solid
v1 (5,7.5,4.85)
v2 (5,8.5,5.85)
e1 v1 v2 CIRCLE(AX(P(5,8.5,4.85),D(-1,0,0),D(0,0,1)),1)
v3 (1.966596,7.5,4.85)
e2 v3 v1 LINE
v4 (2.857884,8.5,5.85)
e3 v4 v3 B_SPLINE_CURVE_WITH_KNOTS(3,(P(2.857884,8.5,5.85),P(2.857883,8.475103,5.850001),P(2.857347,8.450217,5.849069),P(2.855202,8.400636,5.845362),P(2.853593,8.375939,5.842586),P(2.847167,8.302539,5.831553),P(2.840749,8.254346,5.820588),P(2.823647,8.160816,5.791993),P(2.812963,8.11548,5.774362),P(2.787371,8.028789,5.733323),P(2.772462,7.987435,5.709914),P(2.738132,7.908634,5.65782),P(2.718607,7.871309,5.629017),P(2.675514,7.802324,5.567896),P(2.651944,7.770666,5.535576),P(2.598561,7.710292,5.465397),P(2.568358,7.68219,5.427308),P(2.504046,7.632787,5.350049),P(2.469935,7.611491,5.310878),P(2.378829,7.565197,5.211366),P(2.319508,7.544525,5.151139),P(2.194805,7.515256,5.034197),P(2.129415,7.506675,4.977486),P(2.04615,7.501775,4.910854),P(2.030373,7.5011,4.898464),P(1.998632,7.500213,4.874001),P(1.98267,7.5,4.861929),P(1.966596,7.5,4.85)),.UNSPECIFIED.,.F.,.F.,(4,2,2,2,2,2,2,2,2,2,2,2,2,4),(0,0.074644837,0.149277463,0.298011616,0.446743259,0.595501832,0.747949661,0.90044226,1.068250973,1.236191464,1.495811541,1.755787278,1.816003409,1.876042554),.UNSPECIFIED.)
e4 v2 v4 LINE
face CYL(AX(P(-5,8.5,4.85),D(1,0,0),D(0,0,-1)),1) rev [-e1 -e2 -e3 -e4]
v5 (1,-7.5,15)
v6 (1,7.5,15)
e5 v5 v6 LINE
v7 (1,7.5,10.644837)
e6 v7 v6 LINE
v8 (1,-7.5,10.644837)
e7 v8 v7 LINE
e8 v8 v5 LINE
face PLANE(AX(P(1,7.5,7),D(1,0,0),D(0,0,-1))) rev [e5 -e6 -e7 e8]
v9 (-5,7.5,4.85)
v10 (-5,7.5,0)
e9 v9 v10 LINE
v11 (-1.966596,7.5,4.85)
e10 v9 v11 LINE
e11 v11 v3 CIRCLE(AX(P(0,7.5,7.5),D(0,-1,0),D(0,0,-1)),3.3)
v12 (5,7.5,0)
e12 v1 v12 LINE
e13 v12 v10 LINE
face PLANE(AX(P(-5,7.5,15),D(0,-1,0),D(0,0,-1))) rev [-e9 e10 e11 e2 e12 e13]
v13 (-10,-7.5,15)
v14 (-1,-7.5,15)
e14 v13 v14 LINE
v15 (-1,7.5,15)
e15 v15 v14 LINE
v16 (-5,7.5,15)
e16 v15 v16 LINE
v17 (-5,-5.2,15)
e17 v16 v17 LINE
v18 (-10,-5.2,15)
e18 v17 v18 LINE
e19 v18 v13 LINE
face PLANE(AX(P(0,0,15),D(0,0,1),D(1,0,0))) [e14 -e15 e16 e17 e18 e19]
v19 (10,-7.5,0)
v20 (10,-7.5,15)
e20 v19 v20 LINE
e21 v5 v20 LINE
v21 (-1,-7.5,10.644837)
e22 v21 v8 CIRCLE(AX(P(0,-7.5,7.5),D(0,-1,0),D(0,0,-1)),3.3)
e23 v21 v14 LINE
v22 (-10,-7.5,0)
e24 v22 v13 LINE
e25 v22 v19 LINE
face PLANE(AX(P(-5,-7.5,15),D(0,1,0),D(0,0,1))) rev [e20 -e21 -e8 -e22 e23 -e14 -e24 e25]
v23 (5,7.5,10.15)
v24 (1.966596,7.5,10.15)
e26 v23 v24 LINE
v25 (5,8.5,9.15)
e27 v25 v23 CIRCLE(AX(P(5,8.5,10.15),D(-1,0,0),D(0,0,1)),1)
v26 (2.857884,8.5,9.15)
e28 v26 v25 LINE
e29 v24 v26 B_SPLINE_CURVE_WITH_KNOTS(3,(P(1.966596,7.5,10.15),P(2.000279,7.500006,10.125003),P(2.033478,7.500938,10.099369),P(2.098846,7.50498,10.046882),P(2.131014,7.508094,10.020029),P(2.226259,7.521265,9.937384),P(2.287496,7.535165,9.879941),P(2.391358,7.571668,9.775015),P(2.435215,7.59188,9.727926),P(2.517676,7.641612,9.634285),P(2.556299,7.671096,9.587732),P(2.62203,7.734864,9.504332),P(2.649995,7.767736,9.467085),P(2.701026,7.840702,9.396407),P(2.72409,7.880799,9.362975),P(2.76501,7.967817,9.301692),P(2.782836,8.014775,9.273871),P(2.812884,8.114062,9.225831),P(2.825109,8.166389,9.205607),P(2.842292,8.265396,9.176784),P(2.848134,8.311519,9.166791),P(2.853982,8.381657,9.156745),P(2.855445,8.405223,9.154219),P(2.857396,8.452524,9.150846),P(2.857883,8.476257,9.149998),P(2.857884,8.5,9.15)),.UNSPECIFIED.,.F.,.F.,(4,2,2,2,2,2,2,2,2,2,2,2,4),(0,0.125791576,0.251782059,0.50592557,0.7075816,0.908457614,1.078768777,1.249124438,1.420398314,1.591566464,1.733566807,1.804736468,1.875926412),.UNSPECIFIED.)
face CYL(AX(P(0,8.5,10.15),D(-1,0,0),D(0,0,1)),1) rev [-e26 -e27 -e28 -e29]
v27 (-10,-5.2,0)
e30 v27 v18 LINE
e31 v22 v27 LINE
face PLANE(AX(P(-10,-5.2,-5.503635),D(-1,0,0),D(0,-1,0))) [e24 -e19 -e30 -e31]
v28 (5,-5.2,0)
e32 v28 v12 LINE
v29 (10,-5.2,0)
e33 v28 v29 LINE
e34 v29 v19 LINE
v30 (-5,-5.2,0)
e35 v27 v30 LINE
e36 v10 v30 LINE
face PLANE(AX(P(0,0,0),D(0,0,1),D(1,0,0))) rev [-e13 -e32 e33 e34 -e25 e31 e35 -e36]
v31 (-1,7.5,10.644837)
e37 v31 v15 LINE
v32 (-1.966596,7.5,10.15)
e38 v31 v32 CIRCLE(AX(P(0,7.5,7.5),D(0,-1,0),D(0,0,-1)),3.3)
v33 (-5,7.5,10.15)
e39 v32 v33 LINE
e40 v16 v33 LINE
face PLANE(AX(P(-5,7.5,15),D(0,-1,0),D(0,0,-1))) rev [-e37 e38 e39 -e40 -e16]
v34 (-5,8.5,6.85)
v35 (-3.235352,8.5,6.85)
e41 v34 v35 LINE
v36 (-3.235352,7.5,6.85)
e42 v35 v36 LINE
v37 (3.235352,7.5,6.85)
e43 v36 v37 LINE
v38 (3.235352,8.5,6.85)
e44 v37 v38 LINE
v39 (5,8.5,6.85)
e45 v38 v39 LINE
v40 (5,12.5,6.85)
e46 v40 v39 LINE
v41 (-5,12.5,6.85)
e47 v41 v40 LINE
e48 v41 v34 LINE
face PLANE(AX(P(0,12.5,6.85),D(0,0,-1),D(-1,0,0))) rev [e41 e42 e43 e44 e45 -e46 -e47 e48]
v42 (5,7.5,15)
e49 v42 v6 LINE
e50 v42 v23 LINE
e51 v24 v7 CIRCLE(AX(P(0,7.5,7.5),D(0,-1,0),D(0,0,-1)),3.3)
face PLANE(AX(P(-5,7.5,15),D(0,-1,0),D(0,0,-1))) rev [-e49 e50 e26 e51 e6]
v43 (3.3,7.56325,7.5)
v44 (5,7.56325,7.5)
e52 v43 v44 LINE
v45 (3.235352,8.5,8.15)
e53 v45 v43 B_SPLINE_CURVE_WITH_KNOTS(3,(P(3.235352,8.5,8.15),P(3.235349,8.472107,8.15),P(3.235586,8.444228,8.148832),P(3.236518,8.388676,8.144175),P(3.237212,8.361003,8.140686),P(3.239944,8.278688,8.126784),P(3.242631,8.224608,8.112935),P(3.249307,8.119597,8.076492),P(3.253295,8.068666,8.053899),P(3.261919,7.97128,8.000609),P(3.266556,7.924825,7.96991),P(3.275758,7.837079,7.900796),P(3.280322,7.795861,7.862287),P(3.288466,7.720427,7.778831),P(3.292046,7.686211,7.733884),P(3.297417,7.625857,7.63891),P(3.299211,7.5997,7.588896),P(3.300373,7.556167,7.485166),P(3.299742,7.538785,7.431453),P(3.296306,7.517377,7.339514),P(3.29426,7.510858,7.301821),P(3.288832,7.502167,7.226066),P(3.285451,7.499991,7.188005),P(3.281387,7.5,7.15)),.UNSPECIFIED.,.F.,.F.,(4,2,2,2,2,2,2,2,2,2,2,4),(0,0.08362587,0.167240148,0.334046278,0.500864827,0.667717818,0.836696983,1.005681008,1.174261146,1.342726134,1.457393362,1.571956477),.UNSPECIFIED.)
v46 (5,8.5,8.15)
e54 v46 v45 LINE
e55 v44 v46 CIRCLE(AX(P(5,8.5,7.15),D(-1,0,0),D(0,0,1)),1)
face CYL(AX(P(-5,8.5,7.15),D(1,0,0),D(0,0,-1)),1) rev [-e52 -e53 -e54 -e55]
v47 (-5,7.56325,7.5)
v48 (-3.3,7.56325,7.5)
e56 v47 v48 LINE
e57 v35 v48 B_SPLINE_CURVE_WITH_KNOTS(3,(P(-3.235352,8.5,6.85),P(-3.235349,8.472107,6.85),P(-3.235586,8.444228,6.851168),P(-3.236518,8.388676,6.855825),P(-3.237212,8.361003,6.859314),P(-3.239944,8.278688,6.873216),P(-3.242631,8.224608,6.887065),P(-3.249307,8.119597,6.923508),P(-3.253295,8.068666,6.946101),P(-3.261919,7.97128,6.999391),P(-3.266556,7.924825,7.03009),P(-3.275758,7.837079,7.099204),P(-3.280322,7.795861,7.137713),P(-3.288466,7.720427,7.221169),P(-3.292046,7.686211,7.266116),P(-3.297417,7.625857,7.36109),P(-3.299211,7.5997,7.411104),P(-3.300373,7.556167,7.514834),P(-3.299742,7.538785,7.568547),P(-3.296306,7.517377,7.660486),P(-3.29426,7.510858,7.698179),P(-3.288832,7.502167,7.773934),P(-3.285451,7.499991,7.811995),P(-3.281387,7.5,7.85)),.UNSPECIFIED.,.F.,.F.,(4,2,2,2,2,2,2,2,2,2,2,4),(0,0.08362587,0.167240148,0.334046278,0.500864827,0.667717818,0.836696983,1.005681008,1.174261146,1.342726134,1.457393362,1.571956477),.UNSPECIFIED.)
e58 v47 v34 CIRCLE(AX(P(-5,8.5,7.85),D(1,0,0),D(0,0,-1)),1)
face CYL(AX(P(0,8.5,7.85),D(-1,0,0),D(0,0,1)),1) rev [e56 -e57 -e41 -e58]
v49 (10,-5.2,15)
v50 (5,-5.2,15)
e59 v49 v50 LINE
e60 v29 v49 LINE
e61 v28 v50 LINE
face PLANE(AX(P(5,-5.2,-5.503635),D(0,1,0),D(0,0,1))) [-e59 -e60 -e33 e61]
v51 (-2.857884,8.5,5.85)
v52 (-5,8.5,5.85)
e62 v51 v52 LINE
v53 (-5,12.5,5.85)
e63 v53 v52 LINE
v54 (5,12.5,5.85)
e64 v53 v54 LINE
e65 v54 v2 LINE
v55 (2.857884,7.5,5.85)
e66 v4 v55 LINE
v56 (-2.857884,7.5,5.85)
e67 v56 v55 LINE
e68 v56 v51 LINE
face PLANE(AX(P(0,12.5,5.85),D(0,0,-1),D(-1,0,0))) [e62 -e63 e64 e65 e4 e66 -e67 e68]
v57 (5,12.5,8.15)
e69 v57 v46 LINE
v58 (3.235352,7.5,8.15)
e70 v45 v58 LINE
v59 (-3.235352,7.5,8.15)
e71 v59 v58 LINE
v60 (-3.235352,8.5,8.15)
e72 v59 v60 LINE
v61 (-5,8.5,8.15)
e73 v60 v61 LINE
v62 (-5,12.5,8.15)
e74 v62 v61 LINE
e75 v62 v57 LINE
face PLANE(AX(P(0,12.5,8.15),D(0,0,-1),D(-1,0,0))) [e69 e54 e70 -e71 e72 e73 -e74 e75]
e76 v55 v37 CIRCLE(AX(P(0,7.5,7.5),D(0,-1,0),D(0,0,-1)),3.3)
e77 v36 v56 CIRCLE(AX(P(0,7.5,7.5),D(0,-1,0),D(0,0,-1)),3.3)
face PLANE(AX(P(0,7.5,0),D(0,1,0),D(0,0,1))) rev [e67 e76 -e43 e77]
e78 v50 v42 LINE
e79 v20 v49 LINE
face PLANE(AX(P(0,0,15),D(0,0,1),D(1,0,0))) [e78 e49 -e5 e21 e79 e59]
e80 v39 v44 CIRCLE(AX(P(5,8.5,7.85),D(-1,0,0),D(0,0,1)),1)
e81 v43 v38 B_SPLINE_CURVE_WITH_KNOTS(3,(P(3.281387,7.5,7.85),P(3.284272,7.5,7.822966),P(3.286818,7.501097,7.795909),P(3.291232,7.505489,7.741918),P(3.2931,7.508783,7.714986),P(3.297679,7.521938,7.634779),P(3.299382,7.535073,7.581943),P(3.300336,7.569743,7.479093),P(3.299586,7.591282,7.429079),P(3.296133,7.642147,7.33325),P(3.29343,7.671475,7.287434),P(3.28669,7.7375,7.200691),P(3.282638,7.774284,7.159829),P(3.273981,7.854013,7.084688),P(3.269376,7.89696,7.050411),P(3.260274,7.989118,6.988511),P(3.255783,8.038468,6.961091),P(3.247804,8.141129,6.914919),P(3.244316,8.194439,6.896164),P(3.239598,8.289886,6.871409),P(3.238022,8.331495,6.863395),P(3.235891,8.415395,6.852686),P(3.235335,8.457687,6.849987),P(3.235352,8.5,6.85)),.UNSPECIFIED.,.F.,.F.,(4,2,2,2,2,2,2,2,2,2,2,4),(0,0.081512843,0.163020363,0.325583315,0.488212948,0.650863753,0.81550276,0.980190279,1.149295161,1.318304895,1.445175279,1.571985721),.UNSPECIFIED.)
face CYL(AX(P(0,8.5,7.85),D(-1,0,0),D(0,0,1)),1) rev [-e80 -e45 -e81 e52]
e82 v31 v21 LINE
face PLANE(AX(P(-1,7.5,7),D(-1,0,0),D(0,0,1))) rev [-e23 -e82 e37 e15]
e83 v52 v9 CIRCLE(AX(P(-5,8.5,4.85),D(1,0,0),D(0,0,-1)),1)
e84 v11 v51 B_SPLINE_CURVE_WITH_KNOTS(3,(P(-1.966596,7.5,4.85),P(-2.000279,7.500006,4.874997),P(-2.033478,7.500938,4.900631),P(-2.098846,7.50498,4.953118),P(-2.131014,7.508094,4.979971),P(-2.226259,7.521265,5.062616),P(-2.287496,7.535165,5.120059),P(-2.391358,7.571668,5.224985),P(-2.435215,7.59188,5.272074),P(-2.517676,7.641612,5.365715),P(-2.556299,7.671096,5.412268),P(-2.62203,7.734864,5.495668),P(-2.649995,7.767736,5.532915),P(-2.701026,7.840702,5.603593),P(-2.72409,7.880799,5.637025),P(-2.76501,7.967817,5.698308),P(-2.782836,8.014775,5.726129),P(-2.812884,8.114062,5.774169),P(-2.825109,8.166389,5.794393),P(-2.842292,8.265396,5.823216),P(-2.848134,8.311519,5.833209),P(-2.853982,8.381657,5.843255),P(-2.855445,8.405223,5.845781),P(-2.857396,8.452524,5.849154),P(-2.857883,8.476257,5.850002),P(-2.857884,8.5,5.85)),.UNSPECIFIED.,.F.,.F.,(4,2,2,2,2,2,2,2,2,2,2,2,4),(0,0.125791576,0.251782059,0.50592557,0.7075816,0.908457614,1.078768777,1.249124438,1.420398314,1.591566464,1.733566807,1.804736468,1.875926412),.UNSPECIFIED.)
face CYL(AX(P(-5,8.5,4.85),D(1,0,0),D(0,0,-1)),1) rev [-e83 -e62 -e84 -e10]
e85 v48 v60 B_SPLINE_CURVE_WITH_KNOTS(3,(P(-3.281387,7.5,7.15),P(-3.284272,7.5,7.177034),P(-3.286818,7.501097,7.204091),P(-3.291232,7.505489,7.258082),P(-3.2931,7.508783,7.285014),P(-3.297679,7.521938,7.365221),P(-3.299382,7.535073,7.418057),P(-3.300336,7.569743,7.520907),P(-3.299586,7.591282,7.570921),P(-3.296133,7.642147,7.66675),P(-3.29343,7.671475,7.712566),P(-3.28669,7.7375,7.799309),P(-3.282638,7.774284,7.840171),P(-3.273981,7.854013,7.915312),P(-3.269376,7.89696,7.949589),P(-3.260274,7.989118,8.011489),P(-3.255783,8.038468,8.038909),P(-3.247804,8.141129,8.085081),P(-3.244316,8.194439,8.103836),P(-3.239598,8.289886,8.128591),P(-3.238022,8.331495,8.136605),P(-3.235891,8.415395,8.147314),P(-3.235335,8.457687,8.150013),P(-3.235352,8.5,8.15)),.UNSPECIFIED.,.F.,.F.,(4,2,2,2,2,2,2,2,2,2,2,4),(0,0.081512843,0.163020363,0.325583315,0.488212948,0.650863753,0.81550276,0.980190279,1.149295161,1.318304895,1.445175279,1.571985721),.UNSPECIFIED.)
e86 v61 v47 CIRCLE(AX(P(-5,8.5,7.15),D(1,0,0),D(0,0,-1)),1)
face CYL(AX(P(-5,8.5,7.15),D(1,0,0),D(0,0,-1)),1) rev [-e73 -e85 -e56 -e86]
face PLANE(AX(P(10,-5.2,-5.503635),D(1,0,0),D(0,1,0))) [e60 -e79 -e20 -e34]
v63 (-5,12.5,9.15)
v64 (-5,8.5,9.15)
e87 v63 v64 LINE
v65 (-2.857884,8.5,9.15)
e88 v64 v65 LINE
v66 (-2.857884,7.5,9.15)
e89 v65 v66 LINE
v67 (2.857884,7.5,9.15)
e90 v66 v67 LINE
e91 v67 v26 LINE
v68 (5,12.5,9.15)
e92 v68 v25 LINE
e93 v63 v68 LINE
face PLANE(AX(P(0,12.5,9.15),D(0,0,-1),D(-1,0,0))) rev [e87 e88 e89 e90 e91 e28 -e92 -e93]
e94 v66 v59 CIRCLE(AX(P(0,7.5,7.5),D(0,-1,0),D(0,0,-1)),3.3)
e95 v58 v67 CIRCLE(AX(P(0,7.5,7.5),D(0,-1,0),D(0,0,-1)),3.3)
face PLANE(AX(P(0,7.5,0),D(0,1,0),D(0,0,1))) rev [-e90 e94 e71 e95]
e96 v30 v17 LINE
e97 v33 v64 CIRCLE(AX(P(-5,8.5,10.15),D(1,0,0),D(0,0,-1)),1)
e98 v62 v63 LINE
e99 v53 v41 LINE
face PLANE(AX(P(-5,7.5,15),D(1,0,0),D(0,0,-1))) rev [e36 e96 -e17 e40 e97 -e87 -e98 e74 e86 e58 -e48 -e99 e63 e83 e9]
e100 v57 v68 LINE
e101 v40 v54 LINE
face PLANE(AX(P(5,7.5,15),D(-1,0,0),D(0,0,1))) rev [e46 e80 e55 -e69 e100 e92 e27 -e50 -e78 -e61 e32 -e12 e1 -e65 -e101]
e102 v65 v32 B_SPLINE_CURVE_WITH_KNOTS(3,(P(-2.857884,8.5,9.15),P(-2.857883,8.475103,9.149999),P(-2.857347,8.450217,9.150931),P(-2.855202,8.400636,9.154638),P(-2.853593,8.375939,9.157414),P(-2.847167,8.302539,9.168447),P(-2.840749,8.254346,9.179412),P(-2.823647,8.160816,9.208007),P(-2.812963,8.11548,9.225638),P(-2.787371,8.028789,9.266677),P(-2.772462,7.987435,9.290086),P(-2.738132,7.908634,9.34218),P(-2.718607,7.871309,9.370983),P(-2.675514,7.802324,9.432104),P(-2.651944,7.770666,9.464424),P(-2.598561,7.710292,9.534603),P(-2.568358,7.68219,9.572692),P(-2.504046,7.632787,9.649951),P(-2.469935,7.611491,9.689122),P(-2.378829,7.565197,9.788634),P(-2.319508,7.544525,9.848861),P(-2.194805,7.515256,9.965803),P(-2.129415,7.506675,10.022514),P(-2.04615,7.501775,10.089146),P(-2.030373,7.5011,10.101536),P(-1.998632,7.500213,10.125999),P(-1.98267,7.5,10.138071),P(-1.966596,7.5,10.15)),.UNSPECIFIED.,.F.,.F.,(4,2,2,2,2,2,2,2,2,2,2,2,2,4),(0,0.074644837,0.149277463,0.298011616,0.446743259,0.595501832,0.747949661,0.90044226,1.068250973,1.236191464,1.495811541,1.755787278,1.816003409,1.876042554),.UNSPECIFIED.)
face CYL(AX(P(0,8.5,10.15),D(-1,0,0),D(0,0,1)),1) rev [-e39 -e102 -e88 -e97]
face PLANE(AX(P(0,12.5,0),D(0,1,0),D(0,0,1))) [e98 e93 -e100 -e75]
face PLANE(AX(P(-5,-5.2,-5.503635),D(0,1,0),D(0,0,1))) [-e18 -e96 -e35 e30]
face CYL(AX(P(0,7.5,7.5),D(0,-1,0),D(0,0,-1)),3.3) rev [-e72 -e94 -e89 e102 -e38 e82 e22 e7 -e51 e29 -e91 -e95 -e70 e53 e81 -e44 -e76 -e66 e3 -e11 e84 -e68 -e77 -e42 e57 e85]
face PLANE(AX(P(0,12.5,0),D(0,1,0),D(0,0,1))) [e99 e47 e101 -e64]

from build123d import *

# Parameters (mm, degrees)
SKETCH1_W           = 10
SKETCH1_H           = 15
BOSS_EXTRUDE1_DEPTH = 15
SKETCH3_W           = 5
SKETCH3_H           = 2.3
BOSS_EXTRUDE2_DEPTH = 15
SKETCH4_R           = 3.3
CUT_EXTRUDE1_DEPTH  = 24.452078799
SKETCH6_W           = 2
SKETCH6_H           = 15
CUT_EXTRUDE2_DEPTH  = 8
SKETCH7_W           = 10
SKETCH7_H           = 1
BOSS_EXTRUDE3_DEPTH = 5
FILLET1_R           = 1


with BuildPart() as part:
    # Sketch1 → Boss-Extrude1 (new body)
    with BuildSketch(Plane.XY):
        Rectangle(SKETCH1_W, SKETCH1_H)
    extrude(amount=BOSS_EXTRUDE1_DEPTH)

    # Sketch3 → Boss-Extrude2 (add)
    with BuildSketch(Plane.XY.offset(15)):
        with Locations((-7.5, -6.35)):
            Rectangle(SKETCH3_W, SKETCH3_H)
        with Locations((7.5, -6.35)):
            Rectangle(SKETCH3_W, SKETCH3_H)
    extrude(amount=-BOSS_EXTRUDE2_DEPTH)

    # Sketch4 → Cut-Extrude1 (cut, through all)
    with BuildSketch(Plane.XZ.offset(7.5)):
        with Locations(Location((0, 7.5, 0), (0, 0, 270))):
            Circle(SKETCH4_R)
    extrude(amount=-CUT_EXTRUDE1_DEPTH, mode=Mode.SUBTRACT)

    # Sketch6 → Cut-Extrude2 (cut)
    with BuildSketch(Plane.XY.offset(15)):
        Rectangle(SKETCH6_W, SKETCH6_H)
    extrude(amount=-CUT_EXTRUDE2_DEPTH, mode=Mode.SUBTRACT)

    # Sketch7 → Boss-Extrude3 (add)
    with BuildSketch(Plane(origin=(0, 7.5, 0), x_dir=(1, 0, 0), z_dir=(0, 1, 0))):
        with Locations((0, -8.65)):
            Rectangle(SKETCH7_W, SKETCH7_H)
        with Locations((0, -6.35)):
            Rectangle(SKETCH7_W, SKETCH7_H)
    extrude(amount=BOSS_EXTRUDE3_DEPTH)

    # Fillet1
    # the kernel refuses this fillet: 1 mm, written as the material it adds along each edge
    with BuildSketch(Plane(origin=(5, 7.5, 5.85), x_dir=(0, 0, -1), z_dir=(-1, 0, 0))) as fillet1_piece_1_section:
        with BuildLine():
            CenterArc((FILLET1_R, -FILLET1_R), FILLET1_R, 90, 90)
            Line((0, -FILLET1_R), (0, 0))
            Line((0, 0), (FILLET1_R, 0))
        make_face()
    fillet1_piece_1 = extrude(amount=4.642116168, mode=Mode.PRIVATE)
    fillet1_piece_1 = fillet1_piece_1 - Plane(origin=(0, 7.716795794, 7.5), x_dir=(0, 0, -1), z_dir=(0, -1, 0)) * Cylinder(3.3, 14, mode=Mode.PRIVATE)
    add(fillet1_piece_1)
    with BuildSketch(Plane(origin=(0.735351604, 7.5, 6.85), x_dir=(0, 0, 1), z_dir=(1, 0, 0))) as fillet1_piece_2_section:
        with BuildLine():
            CenterArc((FILLET1_R, -FILLET1_R), FILLET1_R, 90, 90)
            Line((0, -FILLET1_R), (0, 0))
            Line((0, 0), (FILLET1_R, 0))
        make_face()
    fillet1_piece_2 = extrude(amount=4.264648396, mode=Mode.PRIVATE)
    fillet1_piece_2 = fillet1_piece_2 - Plane(origin=(0, 7.724716743, 7.5), x_dir=(0, 0, -1), z_dir=(0, -1, 0)) * Cylinder(3.3, 13, mode=Mode.PRIVATE)
    add(fillet1_piece_2)
    with BuildSketch(Plane(origin=(-0.357883832, 7.5, 5.85), x_dir=(0, 0, -1), z_dir=(-1, 0, 0))) as fillet1_piece_3_section:
        with BuildLine():
            CenterArc((FILLET1_R, -FILLET1_R), FILLET1_R, 90, 90)
            Line((0, -FILLET1_R), (0, 0))
            Line((0, 0), (FILLET1_R, 0))
        make_face()
    fillet1_piece_3 = extrude(amount=4.642116168, mode=Mode.PRIVATE)
    fillet1_piece_3 = fillet1_piece_3 - Plane(origin=(0, 7.716795859, 7.5), x_dir=(0, 0, -1), z_dir=(0, -1, 0)) * Cylinder(3.3, 14, mode=Mode.PRIVATE)
    add(fillet1_piece_3)
    with BuildSketch(Plane(origin=(-5, 7.5, 6.85), x_dir=(0, 0, 1), z_dir=(1, 0, 0))) as fillet1_piece_4_section:
        with BuildLine():
            CenterArc((FILLET1_R, -FILLET1_R), FILLET1_R, 90, 90)
            Line((0, -FILLET1_R), (0, 0))
            Line((0, 0), (FILLET1_R, 0))
        make_face()
    fillet1_piece_4 = extrude(amount=4.264648396, mode=Mode.PRIVATE)
    fillet1_piece_4 = fillet1_piece_4 - Plane(origin=(0, 7.724717828, 7.5), x_dir=(0, 0, -1), z_dir=(0, -1, 0)) * Cylinder(3.3, 13, mode=Mode.PRIVATE)
    add(fillet1_piece_4)
    with BuildSketch(Plane(origin=(-0.735351604, 7.5, 8.15), x_dir=(0, 0, -1), z_dir=(-1, 0, 0))) as fillet1_piece_5_section:
        with BuildLine():
            CenterArc((FILLET1_R, -FILLET1_R), FILLET1_R, 90, 90)
            Line((0, -FILLET1_R), (0, 0))
            Line((0, 0), (FILLET1_R, 0))
        make_face()
    fillet1_piece_5 = extrude(amount=4.264648396, mode=Mode.PRIVATE)
    fillet1_piece_5 = fillet1_piece_5 - Plane(origin=(0, 7.724716743, 7.5), x_dir=(0, 0, -1), z_dir=(0, -1, 0)) * Cylinder(3.3, 13, mode=Mode.PRIVATE)
    add(fillet1_piece_5)
    with BuildSketch(Plane(origin=(5, 7.5, 8.15), x_dir=(0, 0, -1), z_dir=(-1, 0, 0))) as fillet1_piece_6_section:
        with BuildLine():
            CenterArc((FILLET1_R, -FILLET1_R), FILLET1_R, 90, 90)
            Line((0, -FILLET1_R), (0, 0))
            Line((0, 0), (FILLET1_R, 0))
        make_face()
    fillet1_piece_6 = extrude(amount=4.264648396, mode=Mode.PRIVATE)
    fillet1_piece_6 = fillet1_piece_6 - Plane(origin=(0, 7.724717828, 7.5), x_dir=(0, 0, -1), z_dir=(0, -1, 0)) * Cylinder(3.3, 13, mode=Mode.PRIVATE)
    add(fillet1_piece_6)
    with BuildSketch(Plane(origin=(-5, 7.5, 9.15), x_dir=(0, 0, 1), z_dir=(1, 0, 0))) as fillet1_piece_7_section:
        with BuildLine():
            CenterArc((FILLET1_R, -FILLET1_R), FILLET1_R, 90, 90)
            Line((0, -FILLET1_R), (0, 0))
            Line((0, 0), (FILLET1_R, 0))
        make_face()
    fillet1_piece_7 = extrude(amount=4.642116168, mode=Mode.PRIVATE)
    fillet1_piece_7 = fillet1_piece_7 - Plane(origin=(0, 7.716795794, 7.5), x_dir=(0, 0, -1), z_dir=(0, -1, 0)) * Cylinder(3.3, 14, mode=Mode.PRIVATE)
    add(fillet1_piece_7)
    with BuildSketch(Plane(origin=(0.357883832, 7.5, 9.15), x_dir=(0, 0, 1), z_dir=(1, 0, 0))) as fillet1_piece_8_section:
        with BuildLine():
            CenterArc((FILLET1_R, -FILLET1_R), FILLET1_R, 90, 90)
            Line((0, -FILLET1_R), (0, 0))
            Line((0, 0), (FILLET1_R, 0))
        make_face()
    fillet1_piece_8 = extrude(amount=4.642116168, mode=Mode.PRIVATE)
    fillet1_piece_8 = fillet1_piece_8 - Plane(origin=(0, 7.716795859, 7.5), x_dir=(0, 0, -1), z_dir=(0, -1, 0)) * Cylinder(3.3, 14, mode=Mode.PRIVATE)
    add(fillet1_piece_8)


solid = part.part
